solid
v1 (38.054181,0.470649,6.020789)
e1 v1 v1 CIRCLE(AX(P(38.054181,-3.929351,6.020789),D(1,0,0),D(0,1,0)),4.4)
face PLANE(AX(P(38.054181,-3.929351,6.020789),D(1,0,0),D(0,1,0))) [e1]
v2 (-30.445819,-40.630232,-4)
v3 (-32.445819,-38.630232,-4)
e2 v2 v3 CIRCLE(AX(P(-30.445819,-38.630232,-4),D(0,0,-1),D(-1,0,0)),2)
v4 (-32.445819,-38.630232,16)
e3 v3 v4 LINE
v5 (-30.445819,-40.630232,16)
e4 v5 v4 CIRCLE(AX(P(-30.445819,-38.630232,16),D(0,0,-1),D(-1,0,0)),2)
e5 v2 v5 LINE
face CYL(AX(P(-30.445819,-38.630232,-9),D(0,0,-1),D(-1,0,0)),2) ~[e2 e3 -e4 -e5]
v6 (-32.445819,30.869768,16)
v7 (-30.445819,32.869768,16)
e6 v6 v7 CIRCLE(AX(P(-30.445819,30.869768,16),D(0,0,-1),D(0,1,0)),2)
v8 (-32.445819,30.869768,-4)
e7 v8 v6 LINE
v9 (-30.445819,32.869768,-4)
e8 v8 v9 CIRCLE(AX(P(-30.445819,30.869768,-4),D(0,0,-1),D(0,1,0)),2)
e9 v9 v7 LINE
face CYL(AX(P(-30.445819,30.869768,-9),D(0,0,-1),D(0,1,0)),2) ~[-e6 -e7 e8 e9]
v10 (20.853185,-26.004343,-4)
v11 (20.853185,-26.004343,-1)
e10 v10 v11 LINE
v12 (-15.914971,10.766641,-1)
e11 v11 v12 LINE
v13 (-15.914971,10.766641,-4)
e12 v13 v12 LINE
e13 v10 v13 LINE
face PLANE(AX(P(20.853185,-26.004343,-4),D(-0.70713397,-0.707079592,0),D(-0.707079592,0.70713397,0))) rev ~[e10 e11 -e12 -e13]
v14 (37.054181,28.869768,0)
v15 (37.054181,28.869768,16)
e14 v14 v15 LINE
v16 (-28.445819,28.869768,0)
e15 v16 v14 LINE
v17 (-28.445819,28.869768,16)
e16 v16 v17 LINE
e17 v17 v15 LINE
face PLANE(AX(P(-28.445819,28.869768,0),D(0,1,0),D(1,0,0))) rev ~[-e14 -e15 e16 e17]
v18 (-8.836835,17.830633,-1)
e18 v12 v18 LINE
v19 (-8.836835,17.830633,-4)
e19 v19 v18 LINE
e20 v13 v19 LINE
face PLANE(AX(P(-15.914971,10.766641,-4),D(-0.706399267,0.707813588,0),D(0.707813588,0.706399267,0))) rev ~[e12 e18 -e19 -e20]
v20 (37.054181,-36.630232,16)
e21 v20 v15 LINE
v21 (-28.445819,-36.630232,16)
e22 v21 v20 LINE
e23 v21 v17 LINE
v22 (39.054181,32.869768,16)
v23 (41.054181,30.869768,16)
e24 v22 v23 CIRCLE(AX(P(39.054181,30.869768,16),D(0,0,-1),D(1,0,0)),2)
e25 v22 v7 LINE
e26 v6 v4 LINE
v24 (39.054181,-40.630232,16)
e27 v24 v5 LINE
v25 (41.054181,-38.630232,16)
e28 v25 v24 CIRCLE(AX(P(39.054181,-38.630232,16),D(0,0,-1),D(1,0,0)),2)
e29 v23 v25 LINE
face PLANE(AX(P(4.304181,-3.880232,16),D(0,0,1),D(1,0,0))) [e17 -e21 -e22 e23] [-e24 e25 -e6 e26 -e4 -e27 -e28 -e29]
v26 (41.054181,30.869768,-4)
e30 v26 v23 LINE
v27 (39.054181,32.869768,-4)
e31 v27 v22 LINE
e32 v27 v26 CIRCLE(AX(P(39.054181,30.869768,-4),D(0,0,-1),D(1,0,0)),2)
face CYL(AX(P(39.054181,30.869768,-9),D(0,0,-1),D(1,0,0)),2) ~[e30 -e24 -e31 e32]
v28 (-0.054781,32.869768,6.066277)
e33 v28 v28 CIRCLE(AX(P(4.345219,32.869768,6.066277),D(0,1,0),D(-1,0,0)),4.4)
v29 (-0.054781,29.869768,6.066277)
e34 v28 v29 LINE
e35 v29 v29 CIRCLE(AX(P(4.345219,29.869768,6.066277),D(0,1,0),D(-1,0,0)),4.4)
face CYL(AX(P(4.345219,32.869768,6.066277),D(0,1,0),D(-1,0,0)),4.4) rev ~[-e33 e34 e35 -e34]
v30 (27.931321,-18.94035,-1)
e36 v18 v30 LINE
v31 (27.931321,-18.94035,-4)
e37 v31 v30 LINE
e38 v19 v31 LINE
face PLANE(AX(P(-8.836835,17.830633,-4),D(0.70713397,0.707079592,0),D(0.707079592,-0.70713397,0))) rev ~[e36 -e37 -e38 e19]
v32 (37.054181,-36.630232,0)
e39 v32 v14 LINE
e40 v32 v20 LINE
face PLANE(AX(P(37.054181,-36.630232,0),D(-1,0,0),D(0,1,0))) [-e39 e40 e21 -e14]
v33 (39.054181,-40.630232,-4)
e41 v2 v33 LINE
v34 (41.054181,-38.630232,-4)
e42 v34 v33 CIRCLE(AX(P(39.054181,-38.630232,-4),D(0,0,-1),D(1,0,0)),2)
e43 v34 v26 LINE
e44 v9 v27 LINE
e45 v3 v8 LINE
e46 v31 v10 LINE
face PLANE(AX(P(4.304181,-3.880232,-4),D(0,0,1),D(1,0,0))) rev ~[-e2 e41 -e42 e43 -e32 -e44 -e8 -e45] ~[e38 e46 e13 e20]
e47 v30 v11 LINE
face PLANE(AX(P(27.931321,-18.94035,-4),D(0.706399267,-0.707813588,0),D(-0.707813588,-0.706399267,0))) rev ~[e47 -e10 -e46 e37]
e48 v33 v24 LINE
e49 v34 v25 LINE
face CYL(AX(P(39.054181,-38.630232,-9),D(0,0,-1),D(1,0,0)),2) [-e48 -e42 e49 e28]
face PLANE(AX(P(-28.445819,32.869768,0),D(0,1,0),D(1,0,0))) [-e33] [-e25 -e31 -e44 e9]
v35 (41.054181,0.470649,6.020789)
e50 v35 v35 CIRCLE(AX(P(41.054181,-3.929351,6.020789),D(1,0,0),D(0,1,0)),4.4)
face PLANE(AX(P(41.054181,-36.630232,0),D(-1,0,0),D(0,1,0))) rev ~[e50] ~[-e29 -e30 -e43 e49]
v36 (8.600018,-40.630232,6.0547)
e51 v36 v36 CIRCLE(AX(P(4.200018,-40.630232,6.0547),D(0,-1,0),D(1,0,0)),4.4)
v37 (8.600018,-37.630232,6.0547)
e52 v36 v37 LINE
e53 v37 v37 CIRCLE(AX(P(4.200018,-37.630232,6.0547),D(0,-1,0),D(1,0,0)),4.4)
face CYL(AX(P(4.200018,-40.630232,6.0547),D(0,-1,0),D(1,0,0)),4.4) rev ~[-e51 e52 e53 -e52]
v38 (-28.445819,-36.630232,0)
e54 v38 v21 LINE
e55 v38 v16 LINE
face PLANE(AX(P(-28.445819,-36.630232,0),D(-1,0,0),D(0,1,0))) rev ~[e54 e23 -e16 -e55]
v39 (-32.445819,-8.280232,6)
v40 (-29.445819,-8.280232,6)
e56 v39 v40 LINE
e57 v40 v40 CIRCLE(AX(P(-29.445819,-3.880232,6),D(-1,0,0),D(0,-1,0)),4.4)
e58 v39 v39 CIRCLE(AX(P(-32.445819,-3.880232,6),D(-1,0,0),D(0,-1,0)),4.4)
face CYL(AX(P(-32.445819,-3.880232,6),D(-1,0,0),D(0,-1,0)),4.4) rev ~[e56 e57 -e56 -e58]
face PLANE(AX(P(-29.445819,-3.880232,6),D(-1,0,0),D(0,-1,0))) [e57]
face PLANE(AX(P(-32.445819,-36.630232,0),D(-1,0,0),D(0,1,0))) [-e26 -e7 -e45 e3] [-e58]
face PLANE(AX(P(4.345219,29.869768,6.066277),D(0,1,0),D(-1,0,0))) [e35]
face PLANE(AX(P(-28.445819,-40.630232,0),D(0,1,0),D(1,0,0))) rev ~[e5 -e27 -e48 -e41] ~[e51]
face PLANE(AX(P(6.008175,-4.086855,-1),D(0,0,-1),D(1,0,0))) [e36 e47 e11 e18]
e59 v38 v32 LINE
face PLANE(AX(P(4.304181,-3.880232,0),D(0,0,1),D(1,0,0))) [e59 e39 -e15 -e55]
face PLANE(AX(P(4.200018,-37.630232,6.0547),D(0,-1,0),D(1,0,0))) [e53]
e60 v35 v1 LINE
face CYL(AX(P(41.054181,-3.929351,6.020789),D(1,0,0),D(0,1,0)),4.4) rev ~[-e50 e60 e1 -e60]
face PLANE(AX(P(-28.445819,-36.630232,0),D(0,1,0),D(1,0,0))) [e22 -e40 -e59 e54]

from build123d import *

# Parameters (mm, degrees)
F0_W        = 65.5
F0_H        = 65.5
F1_DEPTH    = 16
F2_T        = 4
F3_T1_DEPTH = 30
F4_R        = 4.4
F8_DEPTH    = 3
F9_DEPTH    = 3
F5_R        = 4.4
F10_DEPTH   = 3
F6_R        = 4.4
F11_DEPTH   = 3
F7_R        = 4.4
F12_DEPTH   = 3
F14_DEPTH   = 3


# Not quite as in the source:
# - a fillet or chamfer that OpenCascade refuses, or shapes differently, is made with other operations: its cross-section is extruded or revolved along the edge and cut away or added


with BuildPart() as f1:
    # F0 (on Top) → F1 (new body)
    with BuildSketch(Plane.XY):
        with Locations((4.3041806072, -3.8802318871)):
            Rectangle(F0_W, F0_H)
    extrude(amount=F1_DEPTH)

    # F2
    f2_openings = [f1.faces().sort_by_distance(p)[0] for p in [
        (4.304181, -3.880232, 16),
    ]]
    offset(amount=F2_T, openings=f2_openings, kind=Kind.INTERSECTION)

    # F3: fillet of radius 2 on 4 edges, made by hand

    # F3_s2 → F3_t1 (cut)
    with BuildSketch(Plane.XY.offset(-9)):
        with BuildLine():
            ThreePointArc((41.0541806072, -38.6302318871), (40.4683941696, -40.0444454495), (39.0541806072, -40.6302318871))
            Line((39.0541806072, -40.6302318871), (41.0541806072, -40.6302318871))
            Line((41.0541806072, -40.6302318871), (41.0541806072, -38.6302318871))
        make_face()
        with BuildLine():
            ThreePointArc((41.0541806072, 30.8697681129), (40.4683941696, 32.2839816753), (39.0541806072, 32.8697681129))
            Line((39.0541806072, 32.8697681129), (41.0541806072, 32.8697681129))
            Line((41.0541806072, 32.8697681129), (41.0541806072, 30.8697681129))
        make_face()
        with BuildLine():
            ThreePointArc((-30.4458193928, 32.8697681129), (-31.8600329552, 32.2839816753), (-32.4458193928, 30.8697681129))
            Line((-32.4458193928, 30.8697681129), (-32.4458193928, 32.8697681129))
            Line((-32.4458193928, 32.8697681129), (-30.4458193928, 32.8697681129))
        make_face()
        with BuildLine():
            ThreePointArc((-32.4458193928, -38.6302318871), (-31.8600329552, -40.0444454495), (-30.4458193928, -40.6302318871))
            Line((-30.4458193928, -40.6302318871), (-32.4458193928, -40.6302318871))
            Line((-32.4458193928, -40.6302318871), (-32.4458193928, -38.6302318871))
        make_face()
    extrude(amount=F3_T1_DEPTH, mode=Mode.SUBTRACT)

    # F4 (on face) → F8 (join)
    with BuildSketch(Plane(origin=(-32.4458193928, 0, 0), x_dir=(0, -1, 0), z_dir=(-1, 0, 0))):
        with Locations((3.8802318871, 6)):
            Circle(F4_R)
    extrude(amount=-F8_DEPTH)

    # F4 (on face) → F9 (cut)
    with BuildSketch(Plane(origin=(-32.4458193928, 0, 0), x_dir=(0, -1, 0), z_dir=(-1, 0, 0))):
        with Locations((3.8802318871, 6)):
            Circle(F4_R)
    extrude(amount=-F9_DEPTH, mode=Mode.SUBTRACT)

    # F5 (on face) → F10 (cut)
    with BuildSketch(Plane.XZ.offset(40.6302318871)):
        with Locations((4.2000180173, 6.0547004089)):
            Circle(F5_R)
    extrude(amount=-F10_DEPTH, mode=Mode.SUBTRACT)

    # F6 (on face) → F11 (cut)
    with BuildSketch(Plane.YZ.offset(41.0541806072)):
        with Locations((-3.9293510383, 6.0207889489)):
            Circle(F6_R)
    extrude(amount=-F11_DEPTH, mode=Mode.SUBTRACT)

    # F7 (on face) → F12 (cut)
    with BuildSketch(Plane(origin=(0, 32.8697681129, 0), x_dir=(-1, 0, 0), z_dir=(0, 1, 0))):
        with Locations((-4.345219037, 6.0662772571)):
            Circle(F7_R)
    extrude(amount=-F12_DEPTH, mode=Mode.SUBTRACT)

    # F13 (on face) → F14 (cut)
    with BuildSketch(Plane(origin=(0, 0, -4), x_dir=(1, 0, 0), z_dir=(0, 0, -1))):
        Polygon((27.9313208005, 18.9403499991), (20.8531849213, 26.0043426715), (-15.9149708404, -10.7666407574), (-8.8368349613, -17.8306334298), align=None)
    extrude(amount=-F14_DEPTH, mode=Mode.SUBTRACT)


solid = f1.part
